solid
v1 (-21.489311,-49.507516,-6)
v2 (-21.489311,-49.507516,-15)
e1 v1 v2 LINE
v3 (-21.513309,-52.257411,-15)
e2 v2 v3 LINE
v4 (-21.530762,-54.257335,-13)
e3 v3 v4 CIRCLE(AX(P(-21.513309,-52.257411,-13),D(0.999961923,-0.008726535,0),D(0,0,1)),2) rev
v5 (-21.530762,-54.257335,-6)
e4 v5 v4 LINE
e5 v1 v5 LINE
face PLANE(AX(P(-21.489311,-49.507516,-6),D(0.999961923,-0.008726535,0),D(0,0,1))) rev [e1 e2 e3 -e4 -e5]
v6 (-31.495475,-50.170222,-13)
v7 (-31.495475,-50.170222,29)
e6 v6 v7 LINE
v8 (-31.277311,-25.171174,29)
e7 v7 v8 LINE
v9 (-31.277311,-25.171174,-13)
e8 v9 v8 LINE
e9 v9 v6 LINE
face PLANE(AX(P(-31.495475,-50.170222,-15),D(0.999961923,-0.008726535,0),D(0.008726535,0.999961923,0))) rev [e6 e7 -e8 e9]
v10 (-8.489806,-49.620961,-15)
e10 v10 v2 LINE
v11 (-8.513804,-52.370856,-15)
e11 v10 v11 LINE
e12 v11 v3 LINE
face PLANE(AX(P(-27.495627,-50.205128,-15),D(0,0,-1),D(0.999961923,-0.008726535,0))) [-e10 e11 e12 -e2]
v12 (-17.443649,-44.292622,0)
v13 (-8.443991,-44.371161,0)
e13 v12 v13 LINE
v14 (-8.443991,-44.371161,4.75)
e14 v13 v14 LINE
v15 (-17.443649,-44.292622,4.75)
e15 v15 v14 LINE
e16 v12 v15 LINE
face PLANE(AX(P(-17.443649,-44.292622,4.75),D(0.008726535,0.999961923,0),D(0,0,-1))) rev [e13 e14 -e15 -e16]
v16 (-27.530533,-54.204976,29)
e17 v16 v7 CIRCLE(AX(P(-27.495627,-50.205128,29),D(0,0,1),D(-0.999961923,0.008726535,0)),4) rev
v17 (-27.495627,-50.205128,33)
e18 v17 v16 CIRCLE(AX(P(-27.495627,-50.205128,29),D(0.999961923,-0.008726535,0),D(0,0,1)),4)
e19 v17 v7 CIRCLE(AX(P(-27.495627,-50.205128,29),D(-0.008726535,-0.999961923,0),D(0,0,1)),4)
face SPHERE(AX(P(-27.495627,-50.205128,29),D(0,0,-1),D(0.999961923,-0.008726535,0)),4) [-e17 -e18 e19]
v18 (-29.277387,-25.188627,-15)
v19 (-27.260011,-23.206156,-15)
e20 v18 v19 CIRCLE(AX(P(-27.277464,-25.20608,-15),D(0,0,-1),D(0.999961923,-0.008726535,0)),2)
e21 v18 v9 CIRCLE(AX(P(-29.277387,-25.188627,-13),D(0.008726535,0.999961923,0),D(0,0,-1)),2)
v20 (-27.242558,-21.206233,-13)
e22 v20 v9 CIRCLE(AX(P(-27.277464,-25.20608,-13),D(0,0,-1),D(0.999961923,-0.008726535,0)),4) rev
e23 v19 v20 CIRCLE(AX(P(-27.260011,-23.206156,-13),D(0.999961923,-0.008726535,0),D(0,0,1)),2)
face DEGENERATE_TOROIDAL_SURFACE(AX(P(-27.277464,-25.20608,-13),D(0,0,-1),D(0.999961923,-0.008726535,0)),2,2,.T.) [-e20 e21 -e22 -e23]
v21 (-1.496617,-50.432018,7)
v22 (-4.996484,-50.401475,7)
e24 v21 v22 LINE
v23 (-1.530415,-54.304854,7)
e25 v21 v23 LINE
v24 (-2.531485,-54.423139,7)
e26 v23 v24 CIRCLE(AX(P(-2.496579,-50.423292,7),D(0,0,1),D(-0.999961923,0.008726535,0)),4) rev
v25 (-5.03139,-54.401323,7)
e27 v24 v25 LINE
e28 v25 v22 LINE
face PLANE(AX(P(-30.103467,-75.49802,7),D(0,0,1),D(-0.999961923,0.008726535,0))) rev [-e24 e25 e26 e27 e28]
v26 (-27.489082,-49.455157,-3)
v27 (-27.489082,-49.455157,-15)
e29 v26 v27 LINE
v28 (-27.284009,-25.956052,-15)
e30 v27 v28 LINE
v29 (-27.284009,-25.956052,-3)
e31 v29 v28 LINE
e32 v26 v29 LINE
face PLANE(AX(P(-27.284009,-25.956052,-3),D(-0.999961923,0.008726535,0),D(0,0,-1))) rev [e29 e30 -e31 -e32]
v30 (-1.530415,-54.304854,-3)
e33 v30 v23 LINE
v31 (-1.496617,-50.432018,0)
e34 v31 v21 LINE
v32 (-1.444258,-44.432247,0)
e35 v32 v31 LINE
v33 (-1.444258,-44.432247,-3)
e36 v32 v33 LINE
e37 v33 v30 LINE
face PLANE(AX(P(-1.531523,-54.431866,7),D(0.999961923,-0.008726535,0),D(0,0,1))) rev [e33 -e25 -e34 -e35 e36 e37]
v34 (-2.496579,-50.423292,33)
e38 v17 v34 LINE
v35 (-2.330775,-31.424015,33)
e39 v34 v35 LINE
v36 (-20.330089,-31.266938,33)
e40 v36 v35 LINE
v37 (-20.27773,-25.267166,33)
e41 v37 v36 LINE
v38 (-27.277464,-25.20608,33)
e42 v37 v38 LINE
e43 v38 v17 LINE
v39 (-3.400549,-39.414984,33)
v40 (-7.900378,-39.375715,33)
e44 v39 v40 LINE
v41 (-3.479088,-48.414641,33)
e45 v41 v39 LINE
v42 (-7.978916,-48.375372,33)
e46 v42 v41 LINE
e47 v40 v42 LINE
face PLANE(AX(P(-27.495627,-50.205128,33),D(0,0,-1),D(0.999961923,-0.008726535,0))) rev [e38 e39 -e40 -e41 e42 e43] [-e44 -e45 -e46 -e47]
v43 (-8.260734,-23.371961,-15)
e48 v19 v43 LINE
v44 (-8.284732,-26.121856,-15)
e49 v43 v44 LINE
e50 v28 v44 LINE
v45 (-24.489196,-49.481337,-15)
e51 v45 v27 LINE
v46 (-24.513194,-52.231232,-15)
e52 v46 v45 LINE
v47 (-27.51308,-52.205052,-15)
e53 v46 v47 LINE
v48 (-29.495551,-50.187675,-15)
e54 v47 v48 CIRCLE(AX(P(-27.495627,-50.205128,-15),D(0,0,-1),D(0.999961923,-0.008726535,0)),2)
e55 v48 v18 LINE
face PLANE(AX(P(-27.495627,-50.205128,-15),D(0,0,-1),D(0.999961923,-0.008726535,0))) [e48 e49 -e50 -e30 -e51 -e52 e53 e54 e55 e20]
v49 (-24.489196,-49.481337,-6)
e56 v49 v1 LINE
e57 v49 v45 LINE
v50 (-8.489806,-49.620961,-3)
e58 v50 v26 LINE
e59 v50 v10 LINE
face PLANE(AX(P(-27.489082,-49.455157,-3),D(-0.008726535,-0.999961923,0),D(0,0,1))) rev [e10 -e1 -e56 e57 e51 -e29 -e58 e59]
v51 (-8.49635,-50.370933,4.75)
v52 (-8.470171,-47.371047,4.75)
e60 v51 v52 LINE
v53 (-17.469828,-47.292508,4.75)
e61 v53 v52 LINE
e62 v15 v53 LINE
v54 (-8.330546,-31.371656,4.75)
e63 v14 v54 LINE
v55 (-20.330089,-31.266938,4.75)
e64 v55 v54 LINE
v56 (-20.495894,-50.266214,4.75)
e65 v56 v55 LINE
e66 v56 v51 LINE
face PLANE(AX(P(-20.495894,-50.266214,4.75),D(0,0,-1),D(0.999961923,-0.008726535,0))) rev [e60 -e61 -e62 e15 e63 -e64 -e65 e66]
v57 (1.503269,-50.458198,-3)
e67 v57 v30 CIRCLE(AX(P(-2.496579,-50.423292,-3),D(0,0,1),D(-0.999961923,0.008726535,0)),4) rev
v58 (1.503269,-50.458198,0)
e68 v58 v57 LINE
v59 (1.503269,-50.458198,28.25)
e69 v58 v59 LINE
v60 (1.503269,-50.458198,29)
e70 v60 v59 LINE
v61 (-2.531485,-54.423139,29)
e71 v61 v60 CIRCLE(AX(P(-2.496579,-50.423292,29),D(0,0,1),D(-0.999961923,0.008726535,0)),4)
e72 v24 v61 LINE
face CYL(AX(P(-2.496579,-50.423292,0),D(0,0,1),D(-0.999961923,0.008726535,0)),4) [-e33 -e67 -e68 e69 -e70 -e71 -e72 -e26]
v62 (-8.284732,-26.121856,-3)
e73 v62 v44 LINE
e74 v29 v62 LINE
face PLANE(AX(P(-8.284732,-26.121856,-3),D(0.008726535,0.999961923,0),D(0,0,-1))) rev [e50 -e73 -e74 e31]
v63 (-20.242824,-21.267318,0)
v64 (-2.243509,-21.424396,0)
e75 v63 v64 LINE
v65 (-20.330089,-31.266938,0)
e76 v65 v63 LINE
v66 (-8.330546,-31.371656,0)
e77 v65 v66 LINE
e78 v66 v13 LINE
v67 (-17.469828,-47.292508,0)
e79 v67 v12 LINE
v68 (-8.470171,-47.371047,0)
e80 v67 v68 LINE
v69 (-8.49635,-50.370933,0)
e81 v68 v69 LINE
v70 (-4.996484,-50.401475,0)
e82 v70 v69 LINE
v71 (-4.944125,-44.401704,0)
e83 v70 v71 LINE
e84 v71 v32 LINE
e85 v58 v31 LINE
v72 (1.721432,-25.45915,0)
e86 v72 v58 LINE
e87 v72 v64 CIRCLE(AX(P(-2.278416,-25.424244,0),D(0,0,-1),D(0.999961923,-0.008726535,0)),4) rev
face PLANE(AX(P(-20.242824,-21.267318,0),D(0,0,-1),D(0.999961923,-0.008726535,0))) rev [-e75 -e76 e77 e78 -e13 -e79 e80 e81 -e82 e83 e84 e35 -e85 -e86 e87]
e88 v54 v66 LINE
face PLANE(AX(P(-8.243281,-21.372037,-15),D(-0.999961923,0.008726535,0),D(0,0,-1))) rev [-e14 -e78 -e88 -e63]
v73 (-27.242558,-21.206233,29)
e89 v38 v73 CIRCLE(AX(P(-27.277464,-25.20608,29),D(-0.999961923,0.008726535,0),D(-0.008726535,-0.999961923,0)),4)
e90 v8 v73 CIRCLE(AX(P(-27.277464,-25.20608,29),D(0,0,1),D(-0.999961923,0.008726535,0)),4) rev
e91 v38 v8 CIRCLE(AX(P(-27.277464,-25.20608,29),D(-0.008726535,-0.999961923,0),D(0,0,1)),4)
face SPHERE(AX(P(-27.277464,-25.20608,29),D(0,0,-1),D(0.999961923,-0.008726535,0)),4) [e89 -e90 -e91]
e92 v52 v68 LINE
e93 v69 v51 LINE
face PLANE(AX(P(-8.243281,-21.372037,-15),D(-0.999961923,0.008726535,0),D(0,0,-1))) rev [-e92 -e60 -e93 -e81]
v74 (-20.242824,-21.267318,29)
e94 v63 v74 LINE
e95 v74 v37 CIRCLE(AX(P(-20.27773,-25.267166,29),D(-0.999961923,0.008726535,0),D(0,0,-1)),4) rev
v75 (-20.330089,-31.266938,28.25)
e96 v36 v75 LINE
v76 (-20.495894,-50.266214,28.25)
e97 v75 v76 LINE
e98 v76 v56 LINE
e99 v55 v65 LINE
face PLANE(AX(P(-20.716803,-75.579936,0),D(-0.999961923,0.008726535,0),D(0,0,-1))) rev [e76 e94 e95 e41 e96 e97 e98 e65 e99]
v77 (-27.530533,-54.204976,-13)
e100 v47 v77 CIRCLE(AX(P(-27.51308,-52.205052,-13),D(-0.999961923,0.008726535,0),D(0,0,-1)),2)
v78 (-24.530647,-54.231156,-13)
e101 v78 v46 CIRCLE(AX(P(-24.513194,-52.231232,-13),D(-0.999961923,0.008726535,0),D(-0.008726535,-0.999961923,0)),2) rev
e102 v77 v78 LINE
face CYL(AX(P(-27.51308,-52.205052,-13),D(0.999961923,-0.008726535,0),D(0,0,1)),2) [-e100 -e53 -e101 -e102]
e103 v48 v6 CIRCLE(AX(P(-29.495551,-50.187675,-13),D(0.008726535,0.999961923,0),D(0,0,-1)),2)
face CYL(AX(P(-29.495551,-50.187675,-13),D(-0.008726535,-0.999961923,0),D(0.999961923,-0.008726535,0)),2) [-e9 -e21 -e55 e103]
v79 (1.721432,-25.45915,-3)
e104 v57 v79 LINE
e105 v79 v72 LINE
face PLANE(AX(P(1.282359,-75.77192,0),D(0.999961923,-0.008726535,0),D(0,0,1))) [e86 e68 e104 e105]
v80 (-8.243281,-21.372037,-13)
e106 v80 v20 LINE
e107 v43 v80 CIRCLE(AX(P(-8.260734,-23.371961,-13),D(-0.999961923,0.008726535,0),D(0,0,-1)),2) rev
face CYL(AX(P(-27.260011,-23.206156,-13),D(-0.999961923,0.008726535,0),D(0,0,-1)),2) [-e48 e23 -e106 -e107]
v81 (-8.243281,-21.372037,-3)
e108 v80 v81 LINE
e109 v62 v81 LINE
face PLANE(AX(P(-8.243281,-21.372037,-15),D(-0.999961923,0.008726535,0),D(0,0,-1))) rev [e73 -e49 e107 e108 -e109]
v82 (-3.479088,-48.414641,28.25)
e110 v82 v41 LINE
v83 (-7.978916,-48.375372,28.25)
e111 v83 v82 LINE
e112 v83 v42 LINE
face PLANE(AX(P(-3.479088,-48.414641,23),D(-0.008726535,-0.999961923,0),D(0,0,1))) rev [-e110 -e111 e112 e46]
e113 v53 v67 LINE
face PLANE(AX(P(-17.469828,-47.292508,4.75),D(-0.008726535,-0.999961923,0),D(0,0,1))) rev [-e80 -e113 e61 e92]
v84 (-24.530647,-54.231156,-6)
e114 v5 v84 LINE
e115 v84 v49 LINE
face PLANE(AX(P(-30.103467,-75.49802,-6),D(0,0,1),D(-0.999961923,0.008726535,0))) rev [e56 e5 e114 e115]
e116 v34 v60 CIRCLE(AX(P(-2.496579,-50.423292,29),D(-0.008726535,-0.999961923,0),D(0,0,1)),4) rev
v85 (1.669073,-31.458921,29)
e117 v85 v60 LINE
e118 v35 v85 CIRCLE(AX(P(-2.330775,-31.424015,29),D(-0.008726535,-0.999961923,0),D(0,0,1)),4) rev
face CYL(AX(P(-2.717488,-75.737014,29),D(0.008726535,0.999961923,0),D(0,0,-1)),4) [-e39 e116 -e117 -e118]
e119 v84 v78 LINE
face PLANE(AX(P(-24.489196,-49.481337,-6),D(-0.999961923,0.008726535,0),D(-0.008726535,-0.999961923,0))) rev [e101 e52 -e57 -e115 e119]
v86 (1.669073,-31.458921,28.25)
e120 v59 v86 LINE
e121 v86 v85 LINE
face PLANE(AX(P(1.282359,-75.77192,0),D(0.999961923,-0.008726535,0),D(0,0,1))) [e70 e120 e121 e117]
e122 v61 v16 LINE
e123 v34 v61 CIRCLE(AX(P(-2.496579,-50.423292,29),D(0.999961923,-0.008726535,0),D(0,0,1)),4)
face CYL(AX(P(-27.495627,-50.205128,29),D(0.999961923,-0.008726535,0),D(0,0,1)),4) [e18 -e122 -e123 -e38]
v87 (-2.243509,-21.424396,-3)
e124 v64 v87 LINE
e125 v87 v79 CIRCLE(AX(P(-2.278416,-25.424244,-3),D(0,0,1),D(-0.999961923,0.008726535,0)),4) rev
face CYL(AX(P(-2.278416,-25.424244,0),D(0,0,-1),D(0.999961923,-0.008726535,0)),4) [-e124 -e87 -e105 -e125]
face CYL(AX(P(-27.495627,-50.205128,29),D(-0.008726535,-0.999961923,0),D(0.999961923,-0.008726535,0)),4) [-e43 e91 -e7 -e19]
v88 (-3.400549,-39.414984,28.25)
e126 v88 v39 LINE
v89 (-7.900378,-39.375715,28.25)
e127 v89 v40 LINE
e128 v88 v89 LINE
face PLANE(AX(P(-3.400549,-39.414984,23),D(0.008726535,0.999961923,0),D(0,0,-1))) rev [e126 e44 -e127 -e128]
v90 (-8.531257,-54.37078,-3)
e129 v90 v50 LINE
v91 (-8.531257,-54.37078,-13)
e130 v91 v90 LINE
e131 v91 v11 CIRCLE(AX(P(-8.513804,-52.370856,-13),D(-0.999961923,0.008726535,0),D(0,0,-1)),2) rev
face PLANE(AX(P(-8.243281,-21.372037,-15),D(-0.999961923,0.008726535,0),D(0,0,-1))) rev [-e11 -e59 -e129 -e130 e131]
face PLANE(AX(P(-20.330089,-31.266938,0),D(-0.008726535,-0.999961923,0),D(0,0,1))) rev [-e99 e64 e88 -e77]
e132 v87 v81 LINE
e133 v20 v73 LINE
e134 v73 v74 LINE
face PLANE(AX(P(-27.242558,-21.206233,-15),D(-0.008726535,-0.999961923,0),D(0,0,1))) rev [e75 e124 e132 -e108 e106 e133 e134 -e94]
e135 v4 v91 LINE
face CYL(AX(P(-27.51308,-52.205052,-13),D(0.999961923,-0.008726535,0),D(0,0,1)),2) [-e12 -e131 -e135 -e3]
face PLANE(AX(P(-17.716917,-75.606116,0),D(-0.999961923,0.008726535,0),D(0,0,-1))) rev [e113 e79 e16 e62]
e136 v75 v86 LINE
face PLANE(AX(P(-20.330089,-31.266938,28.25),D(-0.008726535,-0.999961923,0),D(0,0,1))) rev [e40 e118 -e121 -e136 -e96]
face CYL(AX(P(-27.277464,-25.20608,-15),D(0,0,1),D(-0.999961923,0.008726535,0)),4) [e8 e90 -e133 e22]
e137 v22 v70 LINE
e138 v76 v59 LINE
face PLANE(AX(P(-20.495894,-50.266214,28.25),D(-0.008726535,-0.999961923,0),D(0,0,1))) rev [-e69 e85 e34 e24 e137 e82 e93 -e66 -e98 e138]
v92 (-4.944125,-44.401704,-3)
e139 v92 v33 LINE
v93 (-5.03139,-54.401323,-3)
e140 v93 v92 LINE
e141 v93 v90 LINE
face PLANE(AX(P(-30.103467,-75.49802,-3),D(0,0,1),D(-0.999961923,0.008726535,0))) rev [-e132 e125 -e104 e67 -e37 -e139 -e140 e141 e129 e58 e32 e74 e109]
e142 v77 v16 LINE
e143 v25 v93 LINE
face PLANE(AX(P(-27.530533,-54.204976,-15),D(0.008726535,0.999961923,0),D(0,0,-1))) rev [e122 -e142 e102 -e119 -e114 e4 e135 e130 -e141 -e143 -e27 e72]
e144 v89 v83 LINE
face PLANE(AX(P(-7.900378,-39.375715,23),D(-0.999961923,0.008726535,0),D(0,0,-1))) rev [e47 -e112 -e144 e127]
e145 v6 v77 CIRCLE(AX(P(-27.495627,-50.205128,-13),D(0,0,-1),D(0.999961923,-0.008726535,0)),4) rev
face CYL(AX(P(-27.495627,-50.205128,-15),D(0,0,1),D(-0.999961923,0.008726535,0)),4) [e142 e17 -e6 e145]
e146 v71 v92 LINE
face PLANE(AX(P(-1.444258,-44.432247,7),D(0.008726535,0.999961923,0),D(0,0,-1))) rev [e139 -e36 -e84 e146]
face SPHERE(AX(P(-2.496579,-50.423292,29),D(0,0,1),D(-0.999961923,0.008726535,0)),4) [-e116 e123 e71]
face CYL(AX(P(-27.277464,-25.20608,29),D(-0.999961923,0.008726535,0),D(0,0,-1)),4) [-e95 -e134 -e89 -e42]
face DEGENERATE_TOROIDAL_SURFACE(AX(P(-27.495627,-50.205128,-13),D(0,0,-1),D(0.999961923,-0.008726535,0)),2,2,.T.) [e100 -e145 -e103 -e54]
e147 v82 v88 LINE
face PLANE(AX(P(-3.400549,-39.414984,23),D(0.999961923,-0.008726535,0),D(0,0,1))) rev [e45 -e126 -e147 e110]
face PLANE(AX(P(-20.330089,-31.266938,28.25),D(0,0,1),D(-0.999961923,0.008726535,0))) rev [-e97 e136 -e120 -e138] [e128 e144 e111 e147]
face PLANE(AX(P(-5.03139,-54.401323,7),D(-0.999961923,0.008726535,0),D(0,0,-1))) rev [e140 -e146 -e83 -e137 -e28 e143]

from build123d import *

# Parameters (mm, degrees)
BOSS_EXTRU_1_DEPTH           = 15
ESQUISSE2_W                  = 19
ESQUISSE2_H                  = 23.5
ENL_V_MAT_EXTRU_1_DEPTH      = 12
ESQUISSE6_W                  = 3
ESQUISSE6_H                  = 4.75
ENL_V_MAT_EXTRU_3_DEPTH      = 9
BOSS_EXTRU_2_START           = 33
BOSS_EXTRU_2_DEPTH           = 33
ENL_V_MAT_EXTRU_2_DEPTH      = 12
ESQUISSE7_W                  = 4.75
ESQUISSE7_H                  = 3
ENL_V_MAT_EXTRU_4_DEPTH      = 9
BOSS_EXTRU_3_DEPTH           = 10
ESQUISSE10_W                 = 4.5
ESQUISSE10_H                 = 9
ENL_V_MAT_EXTRU_5_DEPTH      = 10
ESQUISSE11_W                 = 3.5
ESQUISSE11_H                 = 10
ENL_V_MAT_EXTRU_6_DEPTH      = 10
CONG_2_R                     = 2
CONG_3_R                     = 4
CORPS_D_PLACER_COPIER1_ANGLE = 179.5


with BuildPart() as part:
    # Esquisse1 → Boss.-Extru.1 (new body)
    with BuildSketch(Plane(origin=(-30.750548051, -23.495381217, 0), x_dir=(-1, 0, 0), z_dir=(0, 0, -1))):
        with BuildLine():
            Line((-9.363526751, -30.819304804), (-9.363526751, 2.180695196))
            Line((-9.363526751, 2.180695196), (-28.363526751, 2.180695196))
            ThreePointArc((-28.363526751, 2.180695196), (-31.191953876, 1.009122321), (-32.363526751, -1.819304804))
            Line((-32.363526751, -1.819304804), (-32.363526751, -26.819304804))
            ThreePointArc((-32.363526751, -26.819304804), (-31.191953876, -29.647731929), (-28.363526751, -30.819304804))
            Line((-28.363526751, -30.819304804), (-9.363526751, -30.819304804))
        make_face()
    extrude(amount=BOSS_EXTRU_1_DEPTH)

    # Esquisse2 → Enlèv. mat.-Extru.1 (cut)
    with BuildSketch(Plane(origin=(0, 0, -15), x_dir=(-1, 0, 0), z_dir=(0, 0, -1))):
        with Locations((11.8870213, -37.814686021)):
            Rectangle(ESQUISSE2_W, ESQUISSE2_H)
    extrude(amount=-ENL_V_MAT_EXTRU_1_DEPTH, mode=Mode.SUBTRACT)

    # Esquisse6 → Enlèv. mat.-Extru.3 (cut)
    with BuildSketch(Plane(origin=(0, 0, -15), x_dir=(-1, 0, 0), z_dir=(0, 0, -1))):
        with Locations((6.8870213, -23.689686021)):
            Rectangle(ESQUISSE6_W, ESQUISSE6_H)
    extrude(amount=-ENL_V_MAT_EXTRU_3_DEPTH, mode=Mode.SUBTRACT)

    # Esquisse4 → Boss.-Extru.2 (add)
    with BuildSketch(Plane.XY.offset(BOSS_EXTRU_2_START)):
        with BuildLine():
            Line((-21.3870213, -54.314686021), (-21.3870213, -21.314686021))
            Line((-21.3870213, -21.314686021), (-2.3870213, -21.314686021))
            ThreePointArc((-2.3870213, -21.314686021), (0.441405825, -22.486258896), (1.6129787, -25.314686021))
            Line((1.6129787, -25.314686021), (1.6129787, -50.314686021))
            ThreePointArc((1.6129787, -50.314686021), (0.441405825, -53.143113146), (-2.3870213, -54.314686021))
            Line((-2.3870213, -54.314686021), (-21.3870213, -54.314686021))
        make_face()
    extrude(amount=-BOSS_EXTRU_2_DEPTH)

    # Esquisse5 → Enlèv. mat.-Extru.2 (cut)
    with BuildSketch(Plane.ZY.offset(21.3870213)):
        Polygon((0, -44.314686021), (4.75, -44.314686021), (4.75, -25.314686021), (28.25, -25.314686021), (28.25, -44.314686021), (33, -44.314686021), (33, -54.314686021), (0, -54.314686021), align=None)
    extrude(amount=-ENL_V_MAT_EXTRU_2_DEPTH, mode=Mode.SUBTRACT)

    # Esquisse7 → Enlèv. mat.-Extru.4 (cut)
    with BuildSketch(Plane.ZY.offset(21.3870213)):
        with Locations((2.375, -29.814686021)):
            Rectangle(ESQUISSE7_W, ESQUISSE7_H)
    extrude(amount=-ENL_V_MAT_EXTRU_4_DEPTH, mode=Mode.SUBTRACT)

    # Esquisse9 → Boss.-Extru.3 (add)
    with BuildSketch(Plane.ZY.offset(21.3870213)):
        Polygon((28.25, -44.314686021), (33, -44.314686021), (33, -21.314686021), (-3, -21.314686021), (-3, -54.314686021), (0, -54.314686021), (0, -25.314686021), (28.25, -25.314686021), align=None)
    extrude(amount=BOSS_EXTRU_3_DEPTH)

    # Esquisse10 → Enlèv. mat.-Extru.5 (cut)
    with BuildSketch(Plane.XY.offset(33)):
        with Locations((-24.1370213, -31.814686021)):
            Rectangle(ESQUISSE10_W, ESQUISSE10_H)
    extrude(amount=-ENL_V_MAT_EXTRU_5_DEPTH, mode=Mode.SUBTRACT)

    # Esquisse11 → Enlèv. mat.-Extru.6 (cut)
    with BuildSketch(Plane(origin=(0, 0, -3), x_dir=(-1, 0, 0), z_dir=(0, 0, -1))):
        with Locations((26.6370213, -26.314686021)):
            Rectangle(ESQUISSE11_W, ESQUISSE11_H)
    extrude(amount=-ENL_V_MAT_EXTRU_6_DEPTH, mode=Mode.SUBTRACT)

    # Congé2
    cong_2_edges = [part.edges().sort_by_distance(p)[0] for p in [
        (-14.8870213, -21.314686021, -15),
        (0.441405825, -22.486258896, -15),
        (1.6129787, -37.814686021, -15),
        (0.441405825, -53.143113146, -15),
        (-3.8870213, -21.314686021, -15),
        (-11.8870213, -54.314686021, -15),
    ]]
    fillet(cong_2_edges, radius=CONG_2_R)

    # Congé3
    cong_3_edges = [part.edges().sort_by_distance(p)[0] for p in [
        (-31.3870213, -21.314686021, 15),
        (-31.3870213, -54.314686021, -1.5),
        (1.6129787, -37.814686021, 33),
        (-16.8870213, -21.314686021, 33),
        (-5.8870213, -54.314686021, 33),
        (-31.3870213, -32.814686021, 33),
        (0.441405825, -53.143113146, 33),
        (0.441405825, -22.486258896, 33),
    ]]
    fillet(cong_3_edges, radius=CONG_3_R - 0.0001)  # a hair under: the kernel refuses the full size


with BuildPart() as part_1:
    # Corps-Déplacer/Copier1: moved
    add(part.part.rotate(Axis((-14.8870213, -37.814686021, 0), (0, 0, 1)), CORPS_D_PLACER_COPIER1_ANGLE))


solid = part_1.part
